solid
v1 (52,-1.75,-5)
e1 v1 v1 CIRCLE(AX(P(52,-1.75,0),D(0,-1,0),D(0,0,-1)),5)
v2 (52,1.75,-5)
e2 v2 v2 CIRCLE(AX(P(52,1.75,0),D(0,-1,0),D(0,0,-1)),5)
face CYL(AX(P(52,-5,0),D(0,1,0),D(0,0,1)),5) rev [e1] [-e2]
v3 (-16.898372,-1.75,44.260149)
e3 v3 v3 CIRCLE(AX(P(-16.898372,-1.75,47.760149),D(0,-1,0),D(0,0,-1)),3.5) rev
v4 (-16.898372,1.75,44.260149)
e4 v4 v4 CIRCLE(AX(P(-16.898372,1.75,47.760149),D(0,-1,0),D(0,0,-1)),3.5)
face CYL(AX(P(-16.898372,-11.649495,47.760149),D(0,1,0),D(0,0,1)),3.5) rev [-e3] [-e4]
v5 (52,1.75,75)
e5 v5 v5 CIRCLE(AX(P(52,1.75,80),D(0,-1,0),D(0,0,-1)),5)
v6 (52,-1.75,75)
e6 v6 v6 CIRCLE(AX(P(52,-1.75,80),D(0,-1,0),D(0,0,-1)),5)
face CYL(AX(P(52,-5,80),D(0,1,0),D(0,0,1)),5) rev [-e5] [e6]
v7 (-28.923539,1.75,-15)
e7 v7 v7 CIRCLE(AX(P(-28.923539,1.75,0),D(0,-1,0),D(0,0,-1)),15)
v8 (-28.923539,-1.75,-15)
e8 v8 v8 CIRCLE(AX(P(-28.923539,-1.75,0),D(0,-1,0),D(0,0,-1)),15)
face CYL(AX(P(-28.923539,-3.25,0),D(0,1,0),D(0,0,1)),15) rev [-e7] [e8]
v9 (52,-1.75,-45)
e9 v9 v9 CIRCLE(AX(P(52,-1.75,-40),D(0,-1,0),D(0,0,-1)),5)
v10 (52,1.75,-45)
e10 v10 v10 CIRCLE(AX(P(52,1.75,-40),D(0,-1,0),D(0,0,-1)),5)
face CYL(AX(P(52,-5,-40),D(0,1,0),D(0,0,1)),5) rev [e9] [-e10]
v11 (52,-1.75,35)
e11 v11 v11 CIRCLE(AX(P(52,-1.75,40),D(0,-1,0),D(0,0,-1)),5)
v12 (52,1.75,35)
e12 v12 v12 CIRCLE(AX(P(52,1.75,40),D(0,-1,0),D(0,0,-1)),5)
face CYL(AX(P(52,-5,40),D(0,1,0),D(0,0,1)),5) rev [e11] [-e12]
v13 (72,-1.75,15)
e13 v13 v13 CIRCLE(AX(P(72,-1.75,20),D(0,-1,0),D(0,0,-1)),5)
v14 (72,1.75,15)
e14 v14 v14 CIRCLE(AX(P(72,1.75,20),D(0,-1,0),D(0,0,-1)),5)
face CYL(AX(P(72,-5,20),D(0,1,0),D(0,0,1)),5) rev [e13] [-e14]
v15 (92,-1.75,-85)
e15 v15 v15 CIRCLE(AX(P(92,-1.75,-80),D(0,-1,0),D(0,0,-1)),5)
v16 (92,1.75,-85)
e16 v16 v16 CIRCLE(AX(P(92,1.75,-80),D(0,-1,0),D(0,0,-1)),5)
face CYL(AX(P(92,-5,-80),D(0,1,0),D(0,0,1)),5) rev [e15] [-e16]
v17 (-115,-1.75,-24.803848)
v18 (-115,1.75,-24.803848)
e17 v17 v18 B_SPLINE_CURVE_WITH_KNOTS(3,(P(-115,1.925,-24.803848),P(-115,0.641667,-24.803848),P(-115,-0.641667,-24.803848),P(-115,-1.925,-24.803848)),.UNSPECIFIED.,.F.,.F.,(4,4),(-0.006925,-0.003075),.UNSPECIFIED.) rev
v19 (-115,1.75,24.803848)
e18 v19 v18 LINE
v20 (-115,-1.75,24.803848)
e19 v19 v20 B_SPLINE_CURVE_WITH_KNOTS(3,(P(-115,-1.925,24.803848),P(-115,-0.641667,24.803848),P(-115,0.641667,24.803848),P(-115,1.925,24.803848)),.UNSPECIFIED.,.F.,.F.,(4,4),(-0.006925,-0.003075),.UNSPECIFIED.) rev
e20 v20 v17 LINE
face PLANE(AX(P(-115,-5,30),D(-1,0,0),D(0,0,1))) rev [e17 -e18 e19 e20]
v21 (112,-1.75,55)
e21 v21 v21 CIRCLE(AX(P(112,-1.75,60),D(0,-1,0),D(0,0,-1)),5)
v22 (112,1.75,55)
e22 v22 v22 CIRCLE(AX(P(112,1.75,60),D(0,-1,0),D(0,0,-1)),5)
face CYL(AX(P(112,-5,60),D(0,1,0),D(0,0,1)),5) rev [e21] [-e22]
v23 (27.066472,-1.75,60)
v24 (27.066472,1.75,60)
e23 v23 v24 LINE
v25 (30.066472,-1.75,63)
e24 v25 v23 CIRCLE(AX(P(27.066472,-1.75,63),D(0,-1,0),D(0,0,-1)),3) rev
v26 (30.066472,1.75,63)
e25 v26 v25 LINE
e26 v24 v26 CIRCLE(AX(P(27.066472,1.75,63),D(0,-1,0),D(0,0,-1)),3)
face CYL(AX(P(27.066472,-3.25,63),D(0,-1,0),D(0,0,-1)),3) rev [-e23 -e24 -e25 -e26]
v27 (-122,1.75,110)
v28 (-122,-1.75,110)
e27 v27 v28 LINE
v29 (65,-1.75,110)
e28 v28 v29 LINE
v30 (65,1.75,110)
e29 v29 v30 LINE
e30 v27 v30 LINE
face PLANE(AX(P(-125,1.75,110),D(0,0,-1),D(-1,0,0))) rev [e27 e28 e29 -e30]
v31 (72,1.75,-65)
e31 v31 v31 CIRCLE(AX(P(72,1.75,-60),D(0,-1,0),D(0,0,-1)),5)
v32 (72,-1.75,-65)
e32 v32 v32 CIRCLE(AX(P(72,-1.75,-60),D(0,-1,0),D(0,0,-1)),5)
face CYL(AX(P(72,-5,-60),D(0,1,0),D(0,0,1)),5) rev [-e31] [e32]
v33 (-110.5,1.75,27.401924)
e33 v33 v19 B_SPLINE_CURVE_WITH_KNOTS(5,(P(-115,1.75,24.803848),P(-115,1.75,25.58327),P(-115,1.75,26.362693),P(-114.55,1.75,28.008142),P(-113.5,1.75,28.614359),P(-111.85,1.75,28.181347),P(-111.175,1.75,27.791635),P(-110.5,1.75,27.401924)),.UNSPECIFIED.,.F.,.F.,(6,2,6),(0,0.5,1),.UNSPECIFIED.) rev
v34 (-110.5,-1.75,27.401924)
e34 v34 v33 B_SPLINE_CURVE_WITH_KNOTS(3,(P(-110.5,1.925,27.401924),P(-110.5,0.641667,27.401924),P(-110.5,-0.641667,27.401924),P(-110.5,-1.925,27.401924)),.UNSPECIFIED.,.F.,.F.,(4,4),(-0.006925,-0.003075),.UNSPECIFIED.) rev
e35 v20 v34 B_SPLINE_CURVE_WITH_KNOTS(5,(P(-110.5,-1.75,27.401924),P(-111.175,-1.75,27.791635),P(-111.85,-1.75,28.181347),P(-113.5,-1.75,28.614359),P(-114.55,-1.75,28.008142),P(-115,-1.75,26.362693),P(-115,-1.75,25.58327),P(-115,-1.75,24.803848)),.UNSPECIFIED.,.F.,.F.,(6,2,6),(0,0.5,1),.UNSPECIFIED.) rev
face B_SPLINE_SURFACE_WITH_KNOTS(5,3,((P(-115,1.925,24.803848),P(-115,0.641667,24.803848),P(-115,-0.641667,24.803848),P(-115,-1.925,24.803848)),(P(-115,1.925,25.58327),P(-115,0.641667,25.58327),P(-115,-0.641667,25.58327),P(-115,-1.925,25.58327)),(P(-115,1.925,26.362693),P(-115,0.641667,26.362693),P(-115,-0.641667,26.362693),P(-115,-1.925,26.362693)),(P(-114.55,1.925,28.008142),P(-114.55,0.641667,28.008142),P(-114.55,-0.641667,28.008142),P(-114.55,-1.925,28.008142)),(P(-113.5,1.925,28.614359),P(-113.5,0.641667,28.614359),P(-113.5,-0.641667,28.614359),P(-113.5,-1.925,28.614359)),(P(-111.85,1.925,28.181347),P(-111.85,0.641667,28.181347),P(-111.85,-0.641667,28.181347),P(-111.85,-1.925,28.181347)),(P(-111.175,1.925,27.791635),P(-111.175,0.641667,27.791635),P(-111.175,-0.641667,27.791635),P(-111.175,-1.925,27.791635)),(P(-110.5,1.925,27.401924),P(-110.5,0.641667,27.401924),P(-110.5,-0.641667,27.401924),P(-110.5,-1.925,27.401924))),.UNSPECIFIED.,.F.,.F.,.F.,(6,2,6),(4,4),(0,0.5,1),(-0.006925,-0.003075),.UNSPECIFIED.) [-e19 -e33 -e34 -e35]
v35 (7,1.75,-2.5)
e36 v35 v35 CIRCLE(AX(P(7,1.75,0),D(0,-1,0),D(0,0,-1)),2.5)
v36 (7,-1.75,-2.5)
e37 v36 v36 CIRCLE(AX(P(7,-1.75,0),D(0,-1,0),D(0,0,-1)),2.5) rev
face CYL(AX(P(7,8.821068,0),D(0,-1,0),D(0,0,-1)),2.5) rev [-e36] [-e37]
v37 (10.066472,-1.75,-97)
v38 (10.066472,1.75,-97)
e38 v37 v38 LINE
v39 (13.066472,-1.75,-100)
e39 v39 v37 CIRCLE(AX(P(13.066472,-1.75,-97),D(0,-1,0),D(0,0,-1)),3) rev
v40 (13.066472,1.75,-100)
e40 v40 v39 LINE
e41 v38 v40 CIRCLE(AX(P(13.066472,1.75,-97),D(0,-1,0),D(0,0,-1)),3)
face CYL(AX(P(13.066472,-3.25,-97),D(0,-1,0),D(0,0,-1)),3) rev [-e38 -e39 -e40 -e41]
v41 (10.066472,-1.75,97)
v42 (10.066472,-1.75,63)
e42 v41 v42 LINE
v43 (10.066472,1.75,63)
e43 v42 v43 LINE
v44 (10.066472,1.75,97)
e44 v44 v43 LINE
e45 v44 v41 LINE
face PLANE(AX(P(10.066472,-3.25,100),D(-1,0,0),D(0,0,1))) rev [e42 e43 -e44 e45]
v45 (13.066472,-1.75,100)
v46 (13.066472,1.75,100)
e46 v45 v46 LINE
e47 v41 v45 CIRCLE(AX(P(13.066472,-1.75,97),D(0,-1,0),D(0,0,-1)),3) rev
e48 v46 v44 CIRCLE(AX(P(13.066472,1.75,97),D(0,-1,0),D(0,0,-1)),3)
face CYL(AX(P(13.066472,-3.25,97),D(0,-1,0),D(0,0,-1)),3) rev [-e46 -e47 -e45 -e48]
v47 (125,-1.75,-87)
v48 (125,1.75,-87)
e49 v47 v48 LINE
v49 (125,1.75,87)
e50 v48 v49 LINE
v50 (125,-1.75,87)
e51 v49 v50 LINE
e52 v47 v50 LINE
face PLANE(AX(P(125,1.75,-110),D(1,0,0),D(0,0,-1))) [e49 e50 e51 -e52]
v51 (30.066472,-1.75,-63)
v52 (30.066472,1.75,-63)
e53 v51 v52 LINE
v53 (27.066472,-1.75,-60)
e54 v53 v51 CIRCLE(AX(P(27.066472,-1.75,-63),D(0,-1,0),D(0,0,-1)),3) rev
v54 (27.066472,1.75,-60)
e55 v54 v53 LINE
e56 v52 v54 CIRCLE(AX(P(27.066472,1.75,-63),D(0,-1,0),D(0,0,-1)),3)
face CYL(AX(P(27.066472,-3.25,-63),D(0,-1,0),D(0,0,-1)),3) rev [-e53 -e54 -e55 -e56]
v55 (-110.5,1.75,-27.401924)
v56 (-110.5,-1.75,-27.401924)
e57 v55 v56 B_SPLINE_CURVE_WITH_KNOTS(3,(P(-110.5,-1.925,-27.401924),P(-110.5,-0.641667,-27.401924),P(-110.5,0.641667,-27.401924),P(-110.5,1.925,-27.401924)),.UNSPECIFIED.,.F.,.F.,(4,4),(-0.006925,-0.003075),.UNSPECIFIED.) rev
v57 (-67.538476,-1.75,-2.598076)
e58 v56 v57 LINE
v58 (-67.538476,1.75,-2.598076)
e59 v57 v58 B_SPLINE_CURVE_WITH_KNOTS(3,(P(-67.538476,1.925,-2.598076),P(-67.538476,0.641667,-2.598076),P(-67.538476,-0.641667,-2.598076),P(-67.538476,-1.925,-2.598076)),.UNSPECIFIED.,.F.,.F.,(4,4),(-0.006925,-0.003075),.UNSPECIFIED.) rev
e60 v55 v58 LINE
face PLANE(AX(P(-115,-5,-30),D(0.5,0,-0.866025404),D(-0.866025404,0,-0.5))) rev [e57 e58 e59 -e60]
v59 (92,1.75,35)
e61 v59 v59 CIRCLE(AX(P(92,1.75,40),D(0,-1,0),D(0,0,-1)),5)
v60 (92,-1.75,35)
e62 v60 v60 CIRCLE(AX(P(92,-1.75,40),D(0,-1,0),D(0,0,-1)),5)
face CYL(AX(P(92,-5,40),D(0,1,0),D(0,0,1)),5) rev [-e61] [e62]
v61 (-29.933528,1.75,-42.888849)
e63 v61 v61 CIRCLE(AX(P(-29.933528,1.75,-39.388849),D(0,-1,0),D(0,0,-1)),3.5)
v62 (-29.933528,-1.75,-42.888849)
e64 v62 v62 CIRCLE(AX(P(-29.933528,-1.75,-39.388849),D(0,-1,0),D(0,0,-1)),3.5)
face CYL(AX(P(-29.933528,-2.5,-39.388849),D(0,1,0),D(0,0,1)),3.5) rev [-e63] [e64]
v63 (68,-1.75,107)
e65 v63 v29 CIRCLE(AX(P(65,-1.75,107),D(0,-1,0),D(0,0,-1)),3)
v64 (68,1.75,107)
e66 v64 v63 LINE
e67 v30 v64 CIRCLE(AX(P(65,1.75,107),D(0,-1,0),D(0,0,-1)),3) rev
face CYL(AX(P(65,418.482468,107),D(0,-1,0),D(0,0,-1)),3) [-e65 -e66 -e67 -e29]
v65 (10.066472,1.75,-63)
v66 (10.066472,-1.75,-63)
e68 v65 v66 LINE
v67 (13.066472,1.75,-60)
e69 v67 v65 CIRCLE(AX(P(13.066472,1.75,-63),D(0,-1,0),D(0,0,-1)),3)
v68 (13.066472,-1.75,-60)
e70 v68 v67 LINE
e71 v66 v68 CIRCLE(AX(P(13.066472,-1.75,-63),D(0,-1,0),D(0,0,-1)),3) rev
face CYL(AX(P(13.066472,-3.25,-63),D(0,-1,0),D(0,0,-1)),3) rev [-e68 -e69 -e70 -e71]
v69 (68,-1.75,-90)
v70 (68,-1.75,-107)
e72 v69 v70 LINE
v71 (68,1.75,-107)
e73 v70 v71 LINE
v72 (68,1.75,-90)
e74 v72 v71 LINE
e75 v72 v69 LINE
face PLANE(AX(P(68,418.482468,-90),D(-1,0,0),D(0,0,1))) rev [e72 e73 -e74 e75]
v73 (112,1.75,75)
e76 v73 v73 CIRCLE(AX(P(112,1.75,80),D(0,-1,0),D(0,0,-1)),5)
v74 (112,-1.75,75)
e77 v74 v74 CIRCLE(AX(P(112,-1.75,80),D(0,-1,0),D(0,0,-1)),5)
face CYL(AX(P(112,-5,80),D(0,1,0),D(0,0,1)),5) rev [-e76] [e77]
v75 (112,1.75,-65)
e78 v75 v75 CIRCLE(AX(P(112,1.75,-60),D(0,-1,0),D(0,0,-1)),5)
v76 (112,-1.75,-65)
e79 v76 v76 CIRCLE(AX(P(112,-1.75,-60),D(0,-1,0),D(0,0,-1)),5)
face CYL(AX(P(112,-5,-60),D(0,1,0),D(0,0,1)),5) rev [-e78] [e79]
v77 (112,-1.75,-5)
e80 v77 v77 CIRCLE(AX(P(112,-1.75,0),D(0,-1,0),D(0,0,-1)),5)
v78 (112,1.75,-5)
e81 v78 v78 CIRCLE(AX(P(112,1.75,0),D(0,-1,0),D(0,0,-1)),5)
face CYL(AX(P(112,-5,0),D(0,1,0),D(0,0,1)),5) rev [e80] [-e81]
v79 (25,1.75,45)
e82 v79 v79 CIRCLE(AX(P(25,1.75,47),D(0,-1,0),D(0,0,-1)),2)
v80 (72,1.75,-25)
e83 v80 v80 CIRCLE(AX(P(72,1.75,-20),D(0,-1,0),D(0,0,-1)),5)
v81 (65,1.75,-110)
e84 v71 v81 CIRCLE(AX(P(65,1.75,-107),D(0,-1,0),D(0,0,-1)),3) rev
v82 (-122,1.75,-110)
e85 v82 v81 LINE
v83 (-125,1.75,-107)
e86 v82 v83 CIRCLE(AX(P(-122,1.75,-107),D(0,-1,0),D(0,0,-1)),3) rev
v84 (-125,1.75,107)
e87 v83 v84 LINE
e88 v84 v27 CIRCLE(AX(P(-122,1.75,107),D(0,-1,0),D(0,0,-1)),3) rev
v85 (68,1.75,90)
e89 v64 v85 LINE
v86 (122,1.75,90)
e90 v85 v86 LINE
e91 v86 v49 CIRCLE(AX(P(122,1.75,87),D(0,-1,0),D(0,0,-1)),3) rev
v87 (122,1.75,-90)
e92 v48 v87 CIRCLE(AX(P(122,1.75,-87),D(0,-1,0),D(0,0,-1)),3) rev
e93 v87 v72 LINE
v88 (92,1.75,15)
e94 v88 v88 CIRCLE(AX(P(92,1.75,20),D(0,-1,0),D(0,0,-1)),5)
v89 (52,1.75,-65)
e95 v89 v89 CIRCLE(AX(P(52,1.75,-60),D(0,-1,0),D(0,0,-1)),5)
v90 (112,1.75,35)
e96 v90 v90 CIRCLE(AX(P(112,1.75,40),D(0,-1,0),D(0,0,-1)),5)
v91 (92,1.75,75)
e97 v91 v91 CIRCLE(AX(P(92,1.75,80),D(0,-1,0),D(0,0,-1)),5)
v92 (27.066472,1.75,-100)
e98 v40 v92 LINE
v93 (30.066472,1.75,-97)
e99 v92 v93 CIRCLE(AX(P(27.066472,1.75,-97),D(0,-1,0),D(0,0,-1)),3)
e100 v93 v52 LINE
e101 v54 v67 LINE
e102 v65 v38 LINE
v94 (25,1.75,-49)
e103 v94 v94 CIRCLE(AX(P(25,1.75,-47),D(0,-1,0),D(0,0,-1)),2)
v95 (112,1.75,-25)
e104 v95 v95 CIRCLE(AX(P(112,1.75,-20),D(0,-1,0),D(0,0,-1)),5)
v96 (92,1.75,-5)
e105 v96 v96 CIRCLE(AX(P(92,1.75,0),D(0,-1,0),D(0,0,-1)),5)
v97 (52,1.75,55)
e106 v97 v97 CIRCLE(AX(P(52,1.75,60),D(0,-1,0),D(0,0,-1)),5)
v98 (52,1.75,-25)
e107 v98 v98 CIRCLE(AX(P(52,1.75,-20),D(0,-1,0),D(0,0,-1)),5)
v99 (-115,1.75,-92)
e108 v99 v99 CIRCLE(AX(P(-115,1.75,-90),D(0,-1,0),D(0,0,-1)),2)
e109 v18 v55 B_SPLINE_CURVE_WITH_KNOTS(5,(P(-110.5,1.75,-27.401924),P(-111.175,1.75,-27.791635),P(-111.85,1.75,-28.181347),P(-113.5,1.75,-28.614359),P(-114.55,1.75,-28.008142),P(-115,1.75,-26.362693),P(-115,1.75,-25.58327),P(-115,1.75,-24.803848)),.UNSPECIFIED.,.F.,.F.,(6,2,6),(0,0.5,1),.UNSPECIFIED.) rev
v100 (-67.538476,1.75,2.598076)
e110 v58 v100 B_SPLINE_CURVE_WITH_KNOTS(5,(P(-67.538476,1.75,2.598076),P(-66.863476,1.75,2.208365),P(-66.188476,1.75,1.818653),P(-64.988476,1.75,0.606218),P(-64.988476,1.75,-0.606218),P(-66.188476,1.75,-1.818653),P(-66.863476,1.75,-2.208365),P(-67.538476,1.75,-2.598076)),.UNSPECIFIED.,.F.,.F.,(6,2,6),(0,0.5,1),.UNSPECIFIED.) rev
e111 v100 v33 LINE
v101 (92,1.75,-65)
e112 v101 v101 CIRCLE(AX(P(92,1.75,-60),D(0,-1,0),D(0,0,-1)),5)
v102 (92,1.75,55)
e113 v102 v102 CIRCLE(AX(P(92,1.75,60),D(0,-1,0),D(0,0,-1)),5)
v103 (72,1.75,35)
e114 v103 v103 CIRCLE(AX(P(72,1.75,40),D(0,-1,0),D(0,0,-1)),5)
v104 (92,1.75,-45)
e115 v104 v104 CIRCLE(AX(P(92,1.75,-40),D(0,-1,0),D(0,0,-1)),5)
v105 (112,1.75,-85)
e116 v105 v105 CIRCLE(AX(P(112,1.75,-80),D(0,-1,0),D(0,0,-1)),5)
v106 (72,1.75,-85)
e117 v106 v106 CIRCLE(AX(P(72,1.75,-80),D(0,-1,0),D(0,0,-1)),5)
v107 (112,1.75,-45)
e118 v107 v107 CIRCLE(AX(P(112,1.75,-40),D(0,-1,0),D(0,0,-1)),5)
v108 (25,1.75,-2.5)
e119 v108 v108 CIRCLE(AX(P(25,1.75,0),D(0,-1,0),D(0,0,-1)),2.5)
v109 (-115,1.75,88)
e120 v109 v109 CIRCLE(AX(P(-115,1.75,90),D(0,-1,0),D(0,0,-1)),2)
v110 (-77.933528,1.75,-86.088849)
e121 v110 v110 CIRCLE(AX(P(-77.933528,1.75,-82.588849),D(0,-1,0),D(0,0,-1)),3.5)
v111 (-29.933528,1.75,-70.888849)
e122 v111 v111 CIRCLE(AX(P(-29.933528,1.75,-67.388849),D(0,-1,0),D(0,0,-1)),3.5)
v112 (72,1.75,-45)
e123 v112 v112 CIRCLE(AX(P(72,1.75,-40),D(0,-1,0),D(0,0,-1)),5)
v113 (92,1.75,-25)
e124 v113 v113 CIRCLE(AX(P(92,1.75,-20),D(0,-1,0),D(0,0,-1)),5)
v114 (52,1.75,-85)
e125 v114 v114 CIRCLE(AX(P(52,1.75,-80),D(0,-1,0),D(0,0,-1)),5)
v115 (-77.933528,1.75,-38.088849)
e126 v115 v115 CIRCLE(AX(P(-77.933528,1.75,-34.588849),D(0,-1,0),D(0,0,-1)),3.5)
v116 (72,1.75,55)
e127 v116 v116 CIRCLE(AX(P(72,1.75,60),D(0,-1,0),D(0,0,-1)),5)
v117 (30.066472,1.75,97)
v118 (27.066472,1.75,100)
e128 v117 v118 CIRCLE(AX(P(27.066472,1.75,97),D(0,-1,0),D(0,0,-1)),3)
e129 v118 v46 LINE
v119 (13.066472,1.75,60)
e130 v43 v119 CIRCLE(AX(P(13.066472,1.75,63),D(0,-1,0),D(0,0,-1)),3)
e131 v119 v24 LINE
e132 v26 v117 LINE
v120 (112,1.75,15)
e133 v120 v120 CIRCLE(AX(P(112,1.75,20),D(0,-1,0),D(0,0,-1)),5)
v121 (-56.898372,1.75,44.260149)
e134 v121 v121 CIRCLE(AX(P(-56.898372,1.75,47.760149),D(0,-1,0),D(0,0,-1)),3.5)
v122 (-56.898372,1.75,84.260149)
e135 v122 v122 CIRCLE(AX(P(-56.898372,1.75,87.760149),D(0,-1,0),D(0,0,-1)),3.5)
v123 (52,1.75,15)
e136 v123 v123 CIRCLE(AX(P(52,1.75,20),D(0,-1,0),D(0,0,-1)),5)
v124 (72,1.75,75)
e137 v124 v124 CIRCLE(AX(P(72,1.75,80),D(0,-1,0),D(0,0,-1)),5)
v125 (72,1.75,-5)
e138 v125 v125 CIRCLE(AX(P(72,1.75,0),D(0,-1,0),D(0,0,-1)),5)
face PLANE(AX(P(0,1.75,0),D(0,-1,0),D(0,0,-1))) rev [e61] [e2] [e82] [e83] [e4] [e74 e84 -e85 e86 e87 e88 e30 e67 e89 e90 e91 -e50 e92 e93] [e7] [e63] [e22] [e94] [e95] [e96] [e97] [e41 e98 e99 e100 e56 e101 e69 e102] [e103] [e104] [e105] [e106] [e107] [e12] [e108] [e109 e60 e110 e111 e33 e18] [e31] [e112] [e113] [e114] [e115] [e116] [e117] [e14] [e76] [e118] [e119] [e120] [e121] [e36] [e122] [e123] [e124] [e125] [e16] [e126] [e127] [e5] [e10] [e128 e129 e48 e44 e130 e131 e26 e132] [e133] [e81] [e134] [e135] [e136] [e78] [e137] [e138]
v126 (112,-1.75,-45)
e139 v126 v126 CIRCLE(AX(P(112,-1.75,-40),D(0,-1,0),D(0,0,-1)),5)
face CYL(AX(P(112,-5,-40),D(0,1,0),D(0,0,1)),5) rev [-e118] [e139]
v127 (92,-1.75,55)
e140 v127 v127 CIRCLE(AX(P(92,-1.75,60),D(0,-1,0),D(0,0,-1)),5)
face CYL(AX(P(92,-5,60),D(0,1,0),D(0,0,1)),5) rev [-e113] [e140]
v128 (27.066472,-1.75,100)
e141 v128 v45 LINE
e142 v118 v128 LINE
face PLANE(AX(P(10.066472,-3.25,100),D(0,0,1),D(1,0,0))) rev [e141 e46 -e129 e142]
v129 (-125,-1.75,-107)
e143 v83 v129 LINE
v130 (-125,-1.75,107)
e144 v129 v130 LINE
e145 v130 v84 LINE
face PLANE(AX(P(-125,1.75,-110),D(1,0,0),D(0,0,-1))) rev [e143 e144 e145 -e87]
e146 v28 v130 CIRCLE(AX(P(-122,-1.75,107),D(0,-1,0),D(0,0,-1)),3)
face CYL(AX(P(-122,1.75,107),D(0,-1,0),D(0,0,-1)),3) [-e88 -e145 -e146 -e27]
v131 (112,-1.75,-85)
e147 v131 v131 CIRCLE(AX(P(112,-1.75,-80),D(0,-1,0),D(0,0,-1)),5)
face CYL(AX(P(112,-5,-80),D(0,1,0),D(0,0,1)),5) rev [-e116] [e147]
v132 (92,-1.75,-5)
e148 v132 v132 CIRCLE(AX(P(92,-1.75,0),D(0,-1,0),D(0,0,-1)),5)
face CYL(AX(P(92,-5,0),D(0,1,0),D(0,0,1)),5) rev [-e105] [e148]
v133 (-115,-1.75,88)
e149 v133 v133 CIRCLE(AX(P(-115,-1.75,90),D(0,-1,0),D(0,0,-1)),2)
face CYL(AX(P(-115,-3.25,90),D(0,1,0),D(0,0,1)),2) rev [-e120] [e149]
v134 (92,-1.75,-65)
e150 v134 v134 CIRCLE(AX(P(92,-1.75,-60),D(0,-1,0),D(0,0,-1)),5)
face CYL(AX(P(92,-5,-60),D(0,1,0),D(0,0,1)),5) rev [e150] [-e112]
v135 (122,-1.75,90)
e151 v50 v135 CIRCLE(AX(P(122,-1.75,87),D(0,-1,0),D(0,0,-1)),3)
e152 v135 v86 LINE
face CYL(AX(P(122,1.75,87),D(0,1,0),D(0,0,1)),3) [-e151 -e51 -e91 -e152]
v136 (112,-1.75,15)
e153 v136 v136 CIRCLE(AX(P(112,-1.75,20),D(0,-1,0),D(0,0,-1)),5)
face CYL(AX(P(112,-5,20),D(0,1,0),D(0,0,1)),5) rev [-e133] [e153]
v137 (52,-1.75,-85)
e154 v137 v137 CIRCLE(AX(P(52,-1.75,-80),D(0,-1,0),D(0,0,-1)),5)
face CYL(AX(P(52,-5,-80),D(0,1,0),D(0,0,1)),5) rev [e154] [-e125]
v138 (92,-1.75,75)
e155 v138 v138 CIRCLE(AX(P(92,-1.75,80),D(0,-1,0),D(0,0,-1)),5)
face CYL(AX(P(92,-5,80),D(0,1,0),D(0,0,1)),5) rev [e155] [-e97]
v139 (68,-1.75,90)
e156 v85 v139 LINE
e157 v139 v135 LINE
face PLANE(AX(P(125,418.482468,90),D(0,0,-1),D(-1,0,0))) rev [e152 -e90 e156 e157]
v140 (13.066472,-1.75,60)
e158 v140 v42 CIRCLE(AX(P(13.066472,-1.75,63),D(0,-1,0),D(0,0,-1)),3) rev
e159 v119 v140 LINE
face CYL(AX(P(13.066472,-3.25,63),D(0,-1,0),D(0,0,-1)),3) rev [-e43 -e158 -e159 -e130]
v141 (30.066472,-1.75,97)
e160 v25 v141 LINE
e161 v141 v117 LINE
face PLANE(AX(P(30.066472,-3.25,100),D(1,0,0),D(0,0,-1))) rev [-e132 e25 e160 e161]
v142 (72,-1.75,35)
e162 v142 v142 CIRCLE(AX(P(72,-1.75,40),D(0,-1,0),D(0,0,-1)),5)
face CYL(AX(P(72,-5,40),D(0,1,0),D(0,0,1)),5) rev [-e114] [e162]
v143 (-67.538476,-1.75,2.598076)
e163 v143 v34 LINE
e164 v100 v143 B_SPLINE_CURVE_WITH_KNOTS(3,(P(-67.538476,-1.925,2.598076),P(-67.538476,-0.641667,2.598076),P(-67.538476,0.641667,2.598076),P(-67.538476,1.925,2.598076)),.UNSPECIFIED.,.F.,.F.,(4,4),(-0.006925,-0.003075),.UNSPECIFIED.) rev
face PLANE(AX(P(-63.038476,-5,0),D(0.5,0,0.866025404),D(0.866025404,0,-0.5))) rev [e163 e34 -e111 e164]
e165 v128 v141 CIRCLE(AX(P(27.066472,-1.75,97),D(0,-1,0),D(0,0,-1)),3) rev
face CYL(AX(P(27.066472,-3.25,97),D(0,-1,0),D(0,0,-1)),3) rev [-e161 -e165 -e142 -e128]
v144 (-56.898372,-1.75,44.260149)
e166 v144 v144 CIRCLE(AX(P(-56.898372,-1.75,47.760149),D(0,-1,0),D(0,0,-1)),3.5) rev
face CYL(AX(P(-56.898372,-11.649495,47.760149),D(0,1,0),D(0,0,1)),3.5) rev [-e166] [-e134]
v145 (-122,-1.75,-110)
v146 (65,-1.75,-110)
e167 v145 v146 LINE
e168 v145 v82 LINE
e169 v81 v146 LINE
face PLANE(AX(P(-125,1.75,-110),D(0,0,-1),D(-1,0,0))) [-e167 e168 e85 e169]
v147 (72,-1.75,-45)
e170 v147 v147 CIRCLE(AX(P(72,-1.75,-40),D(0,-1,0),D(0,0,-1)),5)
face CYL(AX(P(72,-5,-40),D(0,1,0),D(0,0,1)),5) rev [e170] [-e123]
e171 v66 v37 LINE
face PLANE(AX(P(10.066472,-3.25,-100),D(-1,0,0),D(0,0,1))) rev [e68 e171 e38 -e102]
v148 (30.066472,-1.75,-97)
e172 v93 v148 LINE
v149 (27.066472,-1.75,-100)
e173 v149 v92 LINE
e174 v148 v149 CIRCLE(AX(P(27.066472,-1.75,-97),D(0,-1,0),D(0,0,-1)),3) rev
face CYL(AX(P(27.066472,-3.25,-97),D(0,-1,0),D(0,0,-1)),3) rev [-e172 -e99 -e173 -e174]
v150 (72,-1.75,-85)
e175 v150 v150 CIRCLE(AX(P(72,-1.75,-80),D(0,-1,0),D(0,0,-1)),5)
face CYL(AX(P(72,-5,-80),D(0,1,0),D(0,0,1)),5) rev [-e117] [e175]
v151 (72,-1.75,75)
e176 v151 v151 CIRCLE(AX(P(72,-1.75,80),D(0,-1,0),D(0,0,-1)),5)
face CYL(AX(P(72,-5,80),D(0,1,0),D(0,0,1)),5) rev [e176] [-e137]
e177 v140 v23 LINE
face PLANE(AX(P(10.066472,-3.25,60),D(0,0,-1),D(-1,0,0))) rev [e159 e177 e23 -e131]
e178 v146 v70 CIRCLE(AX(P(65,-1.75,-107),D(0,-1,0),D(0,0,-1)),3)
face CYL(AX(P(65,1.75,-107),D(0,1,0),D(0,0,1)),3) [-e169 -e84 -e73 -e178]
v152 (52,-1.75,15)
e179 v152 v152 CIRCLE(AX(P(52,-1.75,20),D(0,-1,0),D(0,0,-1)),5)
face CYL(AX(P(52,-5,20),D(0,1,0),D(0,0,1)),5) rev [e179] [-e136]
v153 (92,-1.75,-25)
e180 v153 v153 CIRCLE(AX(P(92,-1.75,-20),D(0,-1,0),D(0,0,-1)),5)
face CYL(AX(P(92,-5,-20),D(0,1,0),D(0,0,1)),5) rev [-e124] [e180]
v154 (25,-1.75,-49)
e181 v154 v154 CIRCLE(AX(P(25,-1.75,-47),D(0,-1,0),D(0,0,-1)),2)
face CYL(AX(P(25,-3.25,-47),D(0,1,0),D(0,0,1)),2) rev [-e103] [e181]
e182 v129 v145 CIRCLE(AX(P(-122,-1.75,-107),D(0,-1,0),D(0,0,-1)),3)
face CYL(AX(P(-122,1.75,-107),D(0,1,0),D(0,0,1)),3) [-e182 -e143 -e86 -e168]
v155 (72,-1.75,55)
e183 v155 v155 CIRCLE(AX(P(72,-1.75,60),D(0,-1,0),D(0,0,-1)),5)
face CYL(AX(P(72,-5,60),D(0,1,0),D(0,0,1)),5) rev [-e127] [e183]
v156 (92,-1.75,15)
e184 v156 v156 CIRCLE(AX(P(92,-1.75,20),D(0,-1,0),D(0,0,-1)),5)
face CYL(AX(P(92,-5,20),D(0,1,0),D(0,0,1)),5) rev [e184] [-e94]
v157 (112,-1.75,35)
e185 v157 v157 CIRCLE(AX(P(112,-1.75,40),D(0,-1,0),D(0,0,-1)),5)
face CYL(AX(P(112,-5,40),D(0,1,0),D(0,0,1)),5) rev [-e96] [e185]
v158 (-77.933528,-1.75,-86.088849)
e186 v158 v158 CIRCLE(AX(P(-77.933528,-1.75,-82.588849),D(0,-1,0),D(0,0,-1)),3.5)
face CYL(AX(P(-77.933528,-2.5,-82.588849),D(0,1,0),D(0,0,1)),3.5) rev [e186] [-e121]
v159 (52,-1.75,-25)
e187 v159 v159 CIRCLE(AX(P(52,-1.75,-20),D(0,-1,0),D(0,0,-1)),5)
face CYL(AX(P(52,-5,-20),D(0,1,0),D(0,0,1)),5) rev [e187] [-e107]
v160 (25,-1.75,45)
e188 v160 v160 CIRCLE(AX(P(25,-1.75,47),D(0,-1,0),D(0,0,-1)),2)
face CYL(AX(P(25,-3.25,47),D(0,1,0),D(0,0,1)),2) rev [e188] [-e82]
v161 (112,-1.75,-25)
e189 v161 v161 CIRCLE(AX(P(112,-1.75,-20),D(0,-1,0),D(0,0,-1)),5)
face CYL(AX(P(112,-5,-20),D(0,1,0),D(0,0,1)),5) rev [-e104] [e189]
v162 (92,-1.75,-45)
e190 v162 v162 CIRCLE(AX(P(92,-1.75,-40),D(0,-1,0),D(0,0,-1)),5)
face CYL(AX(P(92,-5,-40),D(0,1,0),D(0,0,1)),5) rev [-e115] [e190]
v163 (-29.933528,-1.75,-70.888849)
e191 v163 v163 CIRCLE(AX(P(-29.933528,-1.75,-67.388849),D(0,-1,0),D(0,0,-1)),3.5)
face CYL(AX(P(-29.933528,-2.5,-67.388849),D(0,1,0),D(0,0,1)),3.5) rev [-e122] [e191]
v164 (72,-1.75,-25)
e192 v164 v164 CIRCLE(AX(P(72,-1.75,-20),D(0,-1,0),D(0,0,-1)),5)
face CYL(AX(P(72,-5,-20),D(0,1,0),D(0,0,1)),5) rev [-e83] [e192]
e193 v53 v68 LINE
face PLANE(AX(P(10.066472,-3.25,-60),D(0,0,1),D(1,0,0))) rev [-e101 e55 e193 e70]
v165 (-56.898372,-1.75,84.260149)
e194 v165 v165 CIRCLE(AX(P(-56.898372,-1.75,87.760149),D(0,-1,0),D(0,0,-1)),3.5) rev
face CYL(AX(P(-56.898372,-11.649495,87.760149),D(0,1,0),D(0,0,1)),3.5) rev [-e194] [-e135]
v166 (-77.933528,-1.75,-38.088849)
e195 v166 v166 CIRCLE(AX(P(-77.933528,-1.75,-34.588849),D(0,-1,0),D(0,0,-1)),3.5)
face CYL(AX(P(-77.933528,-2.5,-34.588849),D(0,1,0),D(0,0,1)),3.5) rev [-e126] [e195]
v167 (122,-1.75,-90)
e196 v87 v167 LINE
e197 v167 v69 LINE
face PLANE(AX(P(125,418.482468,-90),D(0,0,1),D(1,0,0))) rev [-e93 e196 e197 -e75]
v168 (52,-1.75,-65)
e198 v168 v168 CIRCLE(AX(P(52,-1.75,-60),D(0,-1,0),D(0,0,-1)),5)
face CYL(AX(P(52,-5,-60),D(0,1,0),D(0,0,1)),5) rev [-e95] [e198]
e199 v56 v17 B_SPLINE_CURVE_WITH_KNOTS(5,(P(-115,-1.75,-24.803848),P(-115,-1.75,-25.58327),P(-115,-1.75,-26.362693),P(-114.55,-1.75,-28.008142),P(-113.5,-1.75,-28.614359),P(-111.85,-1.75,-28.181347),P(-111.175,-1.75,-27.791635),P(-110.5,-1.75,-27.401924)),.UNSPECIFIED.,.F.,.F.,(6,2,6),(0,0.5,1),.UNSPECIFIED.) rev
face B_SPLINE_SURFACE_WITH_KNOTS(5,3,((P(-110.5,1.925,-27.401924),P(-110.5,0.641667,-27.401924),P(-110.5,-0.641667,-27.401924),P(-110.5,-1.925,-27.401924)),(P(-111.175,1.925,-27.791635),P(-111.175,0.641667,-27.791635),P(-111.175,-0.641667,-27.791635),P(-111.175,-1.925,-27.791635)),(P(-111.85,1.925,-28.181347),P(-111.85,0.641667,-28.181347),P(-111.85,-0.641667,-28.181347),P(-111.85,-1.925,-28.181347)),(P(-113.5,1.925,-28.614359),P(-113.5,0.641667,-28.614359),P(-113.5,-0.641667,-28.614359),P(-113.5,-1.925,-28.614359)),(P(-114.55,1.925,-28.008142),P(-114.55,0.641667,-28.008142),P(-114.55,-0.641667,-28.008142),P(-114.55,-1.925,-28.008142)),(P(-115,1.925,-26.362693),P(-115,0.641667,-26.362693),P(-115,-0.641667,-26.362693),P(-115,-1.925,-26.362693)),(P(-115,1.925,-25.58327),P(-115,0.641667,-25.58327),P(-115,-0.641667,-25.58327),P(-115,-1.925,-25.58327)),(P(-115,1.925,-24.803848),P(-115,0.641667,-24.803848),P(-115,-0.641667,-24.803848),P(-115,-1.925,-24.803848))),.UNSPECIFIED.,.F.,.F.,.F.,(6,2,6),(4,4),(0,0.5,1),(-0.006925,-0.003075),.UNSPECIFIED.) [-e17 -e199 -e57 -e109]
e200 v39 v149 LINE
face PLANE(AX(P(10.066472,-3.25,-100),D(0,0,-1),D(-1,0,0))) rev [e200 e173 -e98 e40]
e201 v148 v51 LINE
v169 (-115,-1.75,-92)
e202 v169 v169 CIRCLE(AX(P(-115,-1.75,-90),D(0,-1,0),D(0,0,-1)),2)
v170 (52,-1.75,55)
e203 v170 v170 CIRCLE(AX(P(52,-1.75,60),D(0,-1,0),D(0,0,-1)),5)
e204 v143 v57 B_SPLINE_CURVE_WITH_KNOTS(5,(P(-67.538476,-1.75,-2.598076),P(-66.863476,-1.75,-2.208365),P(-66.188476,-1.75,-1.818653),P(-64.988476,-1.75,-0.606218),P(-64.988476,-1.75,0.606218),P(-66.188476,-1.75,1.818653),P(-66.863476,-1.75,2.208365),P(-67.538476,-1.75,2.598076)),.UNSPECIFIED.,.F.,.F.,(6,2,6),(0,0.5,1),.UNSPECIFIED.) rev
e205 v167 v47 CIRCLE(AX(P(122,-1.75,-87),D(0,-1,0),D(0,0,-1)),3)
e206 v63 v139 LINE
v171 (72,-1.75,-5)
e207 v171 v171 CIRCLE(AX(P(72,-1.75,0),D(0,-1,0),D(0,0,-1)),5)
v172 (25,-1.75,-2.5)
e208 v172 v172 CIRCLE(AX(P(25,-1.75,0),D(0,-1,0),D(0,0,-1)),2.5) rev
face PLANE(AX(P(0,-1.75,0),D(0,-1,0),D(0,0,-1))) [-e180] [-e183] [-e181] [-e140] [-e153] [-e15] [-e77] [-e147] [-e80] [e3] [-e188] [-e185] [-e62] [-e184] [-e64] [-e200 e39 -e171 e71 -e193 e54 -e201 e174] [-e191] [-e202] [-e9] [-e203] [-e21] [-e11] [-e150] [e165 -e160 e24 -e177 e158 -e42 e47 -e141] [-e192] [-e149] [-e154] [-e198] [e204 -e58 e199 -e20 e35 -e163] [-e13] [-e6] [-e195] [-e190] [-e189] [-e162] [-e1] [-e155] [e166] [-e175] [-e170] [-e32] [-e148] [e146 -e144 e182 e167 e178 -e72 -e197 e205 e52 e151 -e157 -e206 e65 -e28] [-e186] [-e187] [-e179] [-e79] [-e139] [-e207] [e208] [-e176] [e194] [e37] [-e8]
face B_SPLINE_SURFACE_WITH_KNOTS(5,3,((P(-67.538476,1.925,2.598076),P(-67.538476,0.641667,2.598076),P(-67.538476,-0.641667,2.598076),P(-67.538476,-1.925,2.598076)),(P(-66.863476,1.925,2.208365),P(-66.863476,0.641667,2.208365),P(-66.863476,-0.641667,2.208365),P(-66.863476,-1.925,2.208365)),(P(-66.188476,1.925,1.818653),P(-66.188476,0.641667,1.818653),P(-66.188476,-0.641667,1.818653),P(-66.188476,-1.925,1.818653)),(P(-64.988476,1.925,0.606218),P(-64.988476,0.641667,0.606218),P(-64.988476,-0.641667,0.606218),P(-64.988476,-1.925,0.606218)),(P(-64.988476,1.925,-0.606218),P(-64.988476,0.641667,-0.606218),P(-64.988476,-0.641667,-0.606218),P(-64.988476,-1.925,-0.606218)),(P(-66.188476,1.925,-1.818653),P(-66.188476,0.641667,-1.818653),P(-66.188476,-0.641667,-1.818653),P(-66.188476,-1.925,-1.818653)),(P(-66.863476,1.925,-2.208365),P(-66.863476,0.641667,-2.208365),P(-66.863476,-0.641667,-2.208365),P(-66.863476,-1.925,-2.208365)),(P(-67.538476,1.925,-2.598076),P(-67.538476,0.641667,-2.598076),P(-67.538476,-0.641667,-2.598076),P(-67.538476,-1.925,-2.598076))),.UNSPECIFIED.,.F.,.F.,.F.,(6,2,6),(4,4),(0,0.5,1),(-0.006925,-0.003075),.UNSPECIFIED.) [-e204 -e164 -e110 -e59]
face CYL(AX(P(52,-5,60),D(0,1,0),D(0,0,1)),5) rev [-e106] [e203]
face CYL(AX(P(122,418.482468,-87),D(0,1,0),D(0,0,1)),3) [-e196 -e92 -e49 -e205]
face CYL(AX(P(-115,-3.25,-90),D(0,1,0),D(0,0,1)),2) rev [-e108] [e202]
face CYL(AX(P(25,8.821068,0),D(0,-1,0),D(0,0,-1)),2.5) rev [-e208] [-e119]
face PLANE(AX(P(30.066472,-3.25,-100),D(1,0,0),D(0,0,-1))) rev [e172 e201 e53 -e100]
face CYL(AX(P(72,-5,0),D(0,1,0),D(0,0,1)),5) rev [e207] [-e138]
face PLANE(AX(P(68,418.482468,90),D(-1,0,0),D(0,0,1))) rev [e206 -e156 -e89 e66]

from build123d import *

# Parameters (mm, degrees)
SKETCH1_W                       = 250
SKETCH1_H                       = 220
THE_UPPER_CHASISS_DEPTH         = 1.75
BATTARY_REACH                   = 168.517
SKETCH2_R                       = 2.5
BATTARY_DIRECTION_2_REACH       = 168.517
POWER_SECTION_REACH             = 168.517
SKETCH3_R                       = 3.5
POWER_SECTION_DIRECTION_2_REACH = 168.517
ARDUINO_R                       = 3.5
ARDUINO_SECTION_DEPTH           = 2.5
SKETCH7_R                       = 2
LINK_NAILS_DEPTH                = 5
SKETCH9_W                       = 20
SKETCH9_H                       = 40
RECT_CUT_DEPTH                  = 5
SKETCH10_R                      = 15
CIRC_CUT_DEPTH                  = 5
FILLET5_R                       = 3
SKETCH11_R                      = 5
CUT_EXTRUDE1_DEPTH              = 5
LPATTERN1_COUNT                 = 9
LPATTERN1_PITCH                 = 20
LPATTERN1_COUNT_DIR2            = 4
LPATTERN1_PITCH_DIR2            = 20
CUT_EXTRUDE2_DEPTH              = 5
CUT_EXTRUDE4_DEPTH              = 167.517454182
CUT_EXTRUDE4_DEPTH_BACK         = 167.517454182
FILLET7_R                       = 3


with BuildPart() as part:
    # Sketch1 → the upper chasiss (new, symmetric)
    with BuildSketch(Plane(origin=(0, 0, 0), x_dir=(1, 0, 0), z_dir=(0, 1, 0))):
        Rectangle(SKETCH1_W, SKETCH1_H)
    extrude(amount=THE_UPPER_CHASISS_DEPTH, both=True)

    # Battary: up to this face of the body (flat: up to its plane)
    battary_end = Plane(part.part.faces().sort_by_distance((0, 1.75, 0))[0])
    # Sketch2 → Battary (cut, up to the picked face)
    with BuildSketch(Plane(origin=(0, 0, 0), x_dir=(1, 0, 0), z_dir=(0, 1, 0)), mode=Mode.PRIVATE) as battary_sk1:
        with Locations(Location((25, 0, 0), (0, 0, 90))):
            Circle(SKETCH2_R)
    battary_tool1 = split(extrude(battary_sk1.sketch, amount=BATTARY_REACH, mode=Mode.PRIVATE), bisect_by=battary_end, keep=Keep.BOTH, mode=Mode.PRIVATE)
    # Sketch2 → Battary (cut, up to the picked face)
    with BuildSketch(Plane(origin=(0, 0, 0), x_dir=(1, 0, 0), z_dir=(0, 1, 0)), mode=Mode.PRIVATE) as battary_sk2:
        with Locations(Location((7, 0, 0), (0, 0, 90))):
            Circle(SKETCH2_R)
    battary_tool2 = split(extrude(battary_sk2.sketch, amount=BATTARY_REACH, mode=Mode.PRIVATE), bisect_by=battary_end, keep=Keep.BOTH, mode=Mode.PRIVATE)
    add(battary_tool1.solids().sort_by(Axis((25, 0, 0), (0, 1, 0)))[0], mode=Mode.SUBTRACT)
    add(battary_tool2.solids().sort_by(Axis((7, 0, 0), (0, 1, 0)))[0], mode=Mode.SUBTRACT)

    # Battary direction 2: up to this face of the body (flat: up to its plane)
    battary_direction_2_end = Plane(part.part.faces().sort_by_distance((0, -1.75, 0))[0])
    # Sketch2 → Battary direction 2 (cut, up to the picked face)
    with BuildSketch(Plane(origin=(0, 0, 0), x_dir=(1, 0, 0), z_dir=(0, 1, 0)), mode=Mode.PRIVATE) as battary_direction_2_sk1:
        with Locations(Location((25, 0, 0), (0, 0, 90))):
            Circle(SKETCH2_R)
    battary_direction_2_tool1 = split(extrude(battary_direction_2_sk1.sketch, amount=-BATTARY_DIRECTION_2_REACH, mode=Mode.PRIVATE), bisect_by=battary_direction_2_end, keep=Keep.BOTH, mode=Mode.PRIVATE)
    # Sketch2 → Battary direction 2 (cut, up to the picked face)
    with BuildSketch(Plane(origin=(0, 0, 0), x_dir=(1, 0, 0), z_dir=(0, 1, 0)), mode=Mode.PRIVATE) as battary_direction_2_sk2:
        with Locations(Location((7, 0, 0), (0, 0, 90))):
            Circle(SKETCH2_R)
    battary_direction_2_tool2 = split(extrude(battary_direction_2_sk2.sketch, amount=-BATTARY_DIRECTION_2_REACH, mode=Mode.PRIVATE), bisect_by=battary_direction_2_end, keep=Keep.BOTH, mode=Mode.PRIVATE)
    add(battary_direction_2_tool1.solids().sort_by(Axis((25, 0, 0), (0, -1, 0)))[0], mode=Mode.SUBTRACT)
    add(battary_direction_2_tool2.solids().sort_by(Axis((7, 0, 0), (0, -1, 0)))[0], mode=Mode.SUBTRACT)

    # power section: up to this face of the body (flat: up to its plane)
    power_section_end = Plane(part.part.faces().sort_by_distance((-0.011432136, -1.75, 0))[0])
    # Sketch3 → power section (cut, up to the picked face)
    with BuildSketch(Plane(origin=(0, 0, 0), x_dir=(1, 0, 0), z_dir=(0, 1, 0)), mode=Mode.PRIVATE) as power_section_sk1:
        with Locations(Location((-56.898371951, -47.760148577, 0), (0, 0, 90))):
            Circle(SKETCH3_R)
    power_section_tool1 = split(extrude(power_section_sk1.sketch, amount=-POWER_SECTION_REACH, mode=Mode.PRIVATE), bisect_by=power_section_end, keep=Keep.BOTH, mode=Mode.PRIVATE)
    # Sketch3 → power section (cut, up to the picked face)
    with BuildSketch(Plane(origin=(0, 0, 0), x_dir=(1, 0, 0), z_dir=(0, 1, 0)), mode=Mode.PRIVATE) as power_section_sk2:
        with Locations(Location((-16.898371951, -47.760148577, 0), (0, 0, 90))):
            Circle(SKETCH3_R)
    power_section_tool2 = split(extrude(power_section_sk2.sketch, amount=-POWER_SECTION_REACH, mode=Mode.PRIVATE), bisect_by=power_section_end, keep=Keep.BOTH, mode=Mode.PRIVATE)
    # Sketch3 → power section (cut, up to the picked face)
    with BuildSketch(Plane(origin=(0, 0, 0), x_dir=(1, 0, 0), z_dir=(0, 1, 0)), mode=Mode.PRIVATE) as power_section_sk3:
        with Locations(Location((-56.898371951, -87.760148577, 0), (0, 0, 90))):
            Circle(SKETCH3_R)
    power_section_tool3 = split(extrude(power_section_sk3.sketch, amount=-POWER_SECTION_REACH, mode=Mode.PRIVATE), bisect_by=power_section_end, keep=Keep.BOTH, mode=Mode.PRIVATE)
    add(power_section_tool1.solids().sort_by(Axis((-56.898372, 0, 47.760149), (0, -1, 0)))[0], mode=Mode.SUBTRACT)
    add(power_section_tool2.solids().sort_by(Axis((-16.898372, 0, 47.760149), (0, -1, 0)))[0], mode=Mode.SUBTRACT)
    add(power_section_tool3.solids().sort_by(Axis((-56.898372, 0, 87.760149), (0, -1, 0)))[0], mode=Mode.SUBTRACT)

    # power section direction 2: up to this face of the body (flat: up to its plane)
    power_section_direction_2_end = Plane(part.part.faces().sort_by_distance((-0.011432136, 1.75, 0))[0])
    # Sketch3 → power section direction 2 (cut, up to the picked face)
    with BuildSketch(Plane(origin=(0, 0, 0), x_dir=(1, 0, 0), z_dir=(0, 1, 0)), mode=Mode.PRIVATE) as power_section_direction_2_sk1:
        with Locations(Location((-56.898371951, -47.760148577, 0), (0, 0, 90))):
            Circle(SKETCH3_R)
    power_section_direction_2_tool1 = split(extrude(power_section_direction_2_sk1.sketch, amount=POWER_SECTION_DIRECTION_2_REACH, mode=Mode.PRIVATE), bisect_by=power_section_direction_2_end, keep=Keep.BOTH, mode=Mode.PRIVATE)
    # Sketch3 → power section direction 2 (cut, up to the picked face)
    with BuildSketch(Plane(origin=(0, 0, 0), x_dir=(1, 0, 0), z_dir=(0, 1, 0)), mode=Mode.PRIVATE) as power_section_direction_2_sk2:
        with Locations(Location((-16.898371951, -47.760148577, 0), (0, 0, 90))):
            Circle(SKETCH3_R)
    power_section_direction_2_tool2 = split(extrude(power_section_direction_2_sk2.sketch, amount=POWER_SECTION_DIRECTION_2_REACH, mode=Mode.PRIVATE), bisect_by=power_section_direction_2_end, keep=Keep.BOTH, mode=Mode.PRIVATE)
    # Sketch3 → power section direction 2 (cut, up to the picked face)
    with BuildSketch(Plane(origin=(0, 0, 0), x_dir=(1, 0, 0), z_dir=(0, 1, 0)), mode=Mode.PRIVATE) as power_section_direction_2_sk3:
        with Locations(Location((-56.898371951, -87.760148577, 0), (0, 0, 90))):
            Circle(SKETCH3_R)
    power_section_direction_2_tool3 = split(extrude(power_section_direction_2_sk3.sketch, amount=POWER_SECTION_DIRECTION_2_REACH, mode=Mode.PRIVATE), bisect_by=power_section_direction_2_end, keep=Keep.BOTH, mode=Mode.PRIVATE)
    add(power_section_direction_2_tool1.solids().sort_by(Axis((-56.898372, 0, 47.760149), (0, 1, 0)))[0], mode=Mode.SUBTRACT)
    add(power_section_direction_2_tool2.solids().sort_by(Axis((-16.898372, 0, 47.760149), (0, 1, 0)))[0], mode=Mode.SUBTRACT)
    add(power_section_direction_2_tool3.solids().sort_by(Axis((-56.898372, 0, 87.760149), (0, 1, 0)))[0], mode=Mode.SUBTRACT)

    # arduino → arduino section (cut, symmetric)
    with BuildSketch(Plane(origin=(0, 0, 0), x_dir=(1, 0, 0), z_dir=(0, 1, 0))):
        with Locations(Location((-77.933527642, 82.588848983, 0), (0, 0, 90))):
            Circle(ARDUINO_R)
        with Locations(Location((-77.933527642, 34.588848983, 0), (0, 0, 90))):
            Circle(ARDUINO_R)
        with Locations(Location((-29.933527642, 67.388848983, 0), (0, 0, 90))):
            Circle(ARDUINO_R)
        with Locations(Location((-29.933527642, 39.388848983, 0), (0, 0, 90))):
            Circle(ARDUINO_R)
    extrude(amount=ARDUINO_SECTION_DEPTH, both=True, mode=Mode.SUBTRACT)

    # Sketch7 → link nails (cut, symmetric)
    with BuildSketch(Plane(origin=(0, 1.75, 0), x_dir=(1, 0, 0), z_dir=(0, 1, 0))):
        with Locations(Location((-115, -90, 0), (0, 0, 90))):
            Circle(SKETCH7_R)
        with Locations(Location((-115, 90, 0), (0, 0, 90))):
            Circle(SKETCH7_R)
        with Locations(Location((25, 47, 0), (0, 0, 90))):
            Circle(SKETCH7_R)
        with Locations(Location((25, -47, 0), (0, 0, 90))):
            Circle(SKETCH7_R)
    extrude(amount=LINK_NAILS_DEPTH, both=True, mode=Mode.SUBTRACT)

    # Sketch9 → rect cut (cut, symmetric)
    with BuildSketch(Plane(origin=(0, 1.75, 0), x_dir=(1, 0, 0), z_dir=(0, 1, 0))):
        with Locations((20.066472358, 80)):
            Rectangle(SKETCH9_W, SKETCH9_H)
        with Locations((20.066472358, -80)):
            Rectangle(SKETCH9_W, SKETCH9_H)
    extrude(amount=RECT_CUT_DEPTH, both=True, mode=Mode.SUBTRACT)

    # Sketch10 → circ cut (cut, symmetric)
    with BuildSketch(Plane(origin=(0, 1.75, 0), x_dir=(1, 0, 0), z_dir=(0, 1, 0))):
        with Locations(Location((-28.923539072, 0, 0), (0, 0, 90))):
            Circle(SKETCH10_R)
    extrude(amount=CIRC_CUT_DEPTH, both=True, mode=Mode.SUBTRACT)

    # Fillet5
    fillet5_edges = [part.edges().sort_by_distance(p)[0] for p in [
        (10.066472358, 0, 100),
        (10.066472358, 0, 60),
        (30.066472358, 0, 60),
        (30.066472358, 0, 100),
        (30.066472358, 0, -100),
        (30.066472358, 0, -60),
        (10.066472358, 0, -60),
        (10.066472358, 0, -100),
    ]]
    fillet(fillet5_edges, radius=FILLET5_R)

    # Sketch11 → Cut-Extrude1 (cut, symmetric)
    with BuildSketch(Plane(origin=(0, 0, 0), x_dir=(1, 0, 0), z_dir=(0, 1, 0))):
        with Locations(Location((112, 80, 0), (0, 0, 90))):
            Circle(SKETCH11_R)
    cut_extrude1 = extrude(amount=CUT_EXTRUDE1_DEPTH, both=True, mode=Mode.SUBTRACT)

    # LPattern1: Cut-Extrude1 9 × 4
    with Locations(*[(-j * LPATTERN1_PITCH_DIR2, 0, i * LPATTERN1_PITCH) for i in range(LPATTERN1_COUNT) for j in range(LPATTERN1_COUNT_DIR2) if (i, j) != (0, 0)]):
        add(cut_extrude1, mode=Mode.SUBTRACT)

    # Sketch13 → Cut-Extrude2 (cut, symmetric)
    with BuildSketch(Plane(origin=(0, 0, 0), x_dir=(1, 0, 0), z_dir=(0, 1, 0))):
        Polygon((-115, 30), (-63.038475773, 0), (-115, -30), align=None)
    extrude(amount=CUT_EXTRUDE2_DEPTH, both=True, mode=Mode.SUBTRACT)

    # Fillet6
    # a fillet whose section is not a circle: 3 mm, written as the material it adds along each edge (its section moved 0.00015 mm through the faces so that the kernel can cut it)
    with BuildSketch(Plane(origin=(-115, -1.75, 30), x_dir=(0.8660398371803181, 0, -0.4999749997916777), z_dir=(0, 1, 0)), Plane(origin=(-63.038475773, 1.75, 0), x_dir=(-0.8660109696668712, 0, 0.500024999791656), z_dir=(0, -1, 0)), Plane(origin=(-115, -1.75, -30), x_dir=(-2.8867513448411456e-05, 0, 0.9999999995833333), z_dir=(0, 1, 0))) as fillet6_piece_1:
        with BuildLine():
            add(Edge.make_bspline([(5.196152425, 0), (4.416690591, -2.2501e-05), (3.637228756, -4.5002e-05), (1.991685226, 0.449929995), (1.385406821, 1.499964994), (1.818393539, 3.150059994), (2.20810497, 3.825104994), (2.5978164, 4.500149994)], knots=[0, 0, 0, 0, 0, 0, 0.5, 0.5, 1, 1, 1, 1, 1, 1], degree=5))
            Line((2.5978164, 4.500149994), (2.54585401, 4.530148494))
            ThreePointArc((2.54585401, 4.530148494), (1.247010763, 2.280035999), (-0.05196239, 0.0299985))
            Line((-0.05196239, 0.0299985), (1.732e-06, -0.06))
            ThreePointArc((1.732e-06, -0.06), (2.598077942, -0.059925), (5.196154157, -0.06))
            Line((5.196154157, -0.06), (5.196152425, 0))
        make_face()
    extrude(amount=3.5)

    # Sketch16 → Cut-Extrude4 (cut, two sides: drawn at the far end of the back side and taken through both)
    with BuildSketch(Plane(origin=(0, 0, 0), x_dir=(1, 0, 0), z_dir=(0, 1, 0)).offset(-CUT_EXTRUDE4_DEPTH_BACK)):
        Polygon((68, 705.317008407), (68, 110), (68, 90), (125, 90), (125, -90), (68, -90), (68, -110), (68, -705.317008407), (1258.634016814, -705.317008407), (1258.634016814, 705.317008407), align=None)
    extrude(amount=CUT_EXTRUDE4_DEPTH + CUT_EXTRUDE4_DEPTH_BACK, mode=Mode.SUBTRACT)

    # Fillet7
    fillet7_edges = [part.edges().sort_by_distance(p)[0] for p in [
        (125, 0, 90),
        (68, 0, 110),
        (125, 0, -90),
        (68, 0, -110),
        (-125, 0, 110),
        (-125, 0, -110),
    ]]
    fillet(fillet7_edges, radius=FILLET7_R)


solid = part.part
